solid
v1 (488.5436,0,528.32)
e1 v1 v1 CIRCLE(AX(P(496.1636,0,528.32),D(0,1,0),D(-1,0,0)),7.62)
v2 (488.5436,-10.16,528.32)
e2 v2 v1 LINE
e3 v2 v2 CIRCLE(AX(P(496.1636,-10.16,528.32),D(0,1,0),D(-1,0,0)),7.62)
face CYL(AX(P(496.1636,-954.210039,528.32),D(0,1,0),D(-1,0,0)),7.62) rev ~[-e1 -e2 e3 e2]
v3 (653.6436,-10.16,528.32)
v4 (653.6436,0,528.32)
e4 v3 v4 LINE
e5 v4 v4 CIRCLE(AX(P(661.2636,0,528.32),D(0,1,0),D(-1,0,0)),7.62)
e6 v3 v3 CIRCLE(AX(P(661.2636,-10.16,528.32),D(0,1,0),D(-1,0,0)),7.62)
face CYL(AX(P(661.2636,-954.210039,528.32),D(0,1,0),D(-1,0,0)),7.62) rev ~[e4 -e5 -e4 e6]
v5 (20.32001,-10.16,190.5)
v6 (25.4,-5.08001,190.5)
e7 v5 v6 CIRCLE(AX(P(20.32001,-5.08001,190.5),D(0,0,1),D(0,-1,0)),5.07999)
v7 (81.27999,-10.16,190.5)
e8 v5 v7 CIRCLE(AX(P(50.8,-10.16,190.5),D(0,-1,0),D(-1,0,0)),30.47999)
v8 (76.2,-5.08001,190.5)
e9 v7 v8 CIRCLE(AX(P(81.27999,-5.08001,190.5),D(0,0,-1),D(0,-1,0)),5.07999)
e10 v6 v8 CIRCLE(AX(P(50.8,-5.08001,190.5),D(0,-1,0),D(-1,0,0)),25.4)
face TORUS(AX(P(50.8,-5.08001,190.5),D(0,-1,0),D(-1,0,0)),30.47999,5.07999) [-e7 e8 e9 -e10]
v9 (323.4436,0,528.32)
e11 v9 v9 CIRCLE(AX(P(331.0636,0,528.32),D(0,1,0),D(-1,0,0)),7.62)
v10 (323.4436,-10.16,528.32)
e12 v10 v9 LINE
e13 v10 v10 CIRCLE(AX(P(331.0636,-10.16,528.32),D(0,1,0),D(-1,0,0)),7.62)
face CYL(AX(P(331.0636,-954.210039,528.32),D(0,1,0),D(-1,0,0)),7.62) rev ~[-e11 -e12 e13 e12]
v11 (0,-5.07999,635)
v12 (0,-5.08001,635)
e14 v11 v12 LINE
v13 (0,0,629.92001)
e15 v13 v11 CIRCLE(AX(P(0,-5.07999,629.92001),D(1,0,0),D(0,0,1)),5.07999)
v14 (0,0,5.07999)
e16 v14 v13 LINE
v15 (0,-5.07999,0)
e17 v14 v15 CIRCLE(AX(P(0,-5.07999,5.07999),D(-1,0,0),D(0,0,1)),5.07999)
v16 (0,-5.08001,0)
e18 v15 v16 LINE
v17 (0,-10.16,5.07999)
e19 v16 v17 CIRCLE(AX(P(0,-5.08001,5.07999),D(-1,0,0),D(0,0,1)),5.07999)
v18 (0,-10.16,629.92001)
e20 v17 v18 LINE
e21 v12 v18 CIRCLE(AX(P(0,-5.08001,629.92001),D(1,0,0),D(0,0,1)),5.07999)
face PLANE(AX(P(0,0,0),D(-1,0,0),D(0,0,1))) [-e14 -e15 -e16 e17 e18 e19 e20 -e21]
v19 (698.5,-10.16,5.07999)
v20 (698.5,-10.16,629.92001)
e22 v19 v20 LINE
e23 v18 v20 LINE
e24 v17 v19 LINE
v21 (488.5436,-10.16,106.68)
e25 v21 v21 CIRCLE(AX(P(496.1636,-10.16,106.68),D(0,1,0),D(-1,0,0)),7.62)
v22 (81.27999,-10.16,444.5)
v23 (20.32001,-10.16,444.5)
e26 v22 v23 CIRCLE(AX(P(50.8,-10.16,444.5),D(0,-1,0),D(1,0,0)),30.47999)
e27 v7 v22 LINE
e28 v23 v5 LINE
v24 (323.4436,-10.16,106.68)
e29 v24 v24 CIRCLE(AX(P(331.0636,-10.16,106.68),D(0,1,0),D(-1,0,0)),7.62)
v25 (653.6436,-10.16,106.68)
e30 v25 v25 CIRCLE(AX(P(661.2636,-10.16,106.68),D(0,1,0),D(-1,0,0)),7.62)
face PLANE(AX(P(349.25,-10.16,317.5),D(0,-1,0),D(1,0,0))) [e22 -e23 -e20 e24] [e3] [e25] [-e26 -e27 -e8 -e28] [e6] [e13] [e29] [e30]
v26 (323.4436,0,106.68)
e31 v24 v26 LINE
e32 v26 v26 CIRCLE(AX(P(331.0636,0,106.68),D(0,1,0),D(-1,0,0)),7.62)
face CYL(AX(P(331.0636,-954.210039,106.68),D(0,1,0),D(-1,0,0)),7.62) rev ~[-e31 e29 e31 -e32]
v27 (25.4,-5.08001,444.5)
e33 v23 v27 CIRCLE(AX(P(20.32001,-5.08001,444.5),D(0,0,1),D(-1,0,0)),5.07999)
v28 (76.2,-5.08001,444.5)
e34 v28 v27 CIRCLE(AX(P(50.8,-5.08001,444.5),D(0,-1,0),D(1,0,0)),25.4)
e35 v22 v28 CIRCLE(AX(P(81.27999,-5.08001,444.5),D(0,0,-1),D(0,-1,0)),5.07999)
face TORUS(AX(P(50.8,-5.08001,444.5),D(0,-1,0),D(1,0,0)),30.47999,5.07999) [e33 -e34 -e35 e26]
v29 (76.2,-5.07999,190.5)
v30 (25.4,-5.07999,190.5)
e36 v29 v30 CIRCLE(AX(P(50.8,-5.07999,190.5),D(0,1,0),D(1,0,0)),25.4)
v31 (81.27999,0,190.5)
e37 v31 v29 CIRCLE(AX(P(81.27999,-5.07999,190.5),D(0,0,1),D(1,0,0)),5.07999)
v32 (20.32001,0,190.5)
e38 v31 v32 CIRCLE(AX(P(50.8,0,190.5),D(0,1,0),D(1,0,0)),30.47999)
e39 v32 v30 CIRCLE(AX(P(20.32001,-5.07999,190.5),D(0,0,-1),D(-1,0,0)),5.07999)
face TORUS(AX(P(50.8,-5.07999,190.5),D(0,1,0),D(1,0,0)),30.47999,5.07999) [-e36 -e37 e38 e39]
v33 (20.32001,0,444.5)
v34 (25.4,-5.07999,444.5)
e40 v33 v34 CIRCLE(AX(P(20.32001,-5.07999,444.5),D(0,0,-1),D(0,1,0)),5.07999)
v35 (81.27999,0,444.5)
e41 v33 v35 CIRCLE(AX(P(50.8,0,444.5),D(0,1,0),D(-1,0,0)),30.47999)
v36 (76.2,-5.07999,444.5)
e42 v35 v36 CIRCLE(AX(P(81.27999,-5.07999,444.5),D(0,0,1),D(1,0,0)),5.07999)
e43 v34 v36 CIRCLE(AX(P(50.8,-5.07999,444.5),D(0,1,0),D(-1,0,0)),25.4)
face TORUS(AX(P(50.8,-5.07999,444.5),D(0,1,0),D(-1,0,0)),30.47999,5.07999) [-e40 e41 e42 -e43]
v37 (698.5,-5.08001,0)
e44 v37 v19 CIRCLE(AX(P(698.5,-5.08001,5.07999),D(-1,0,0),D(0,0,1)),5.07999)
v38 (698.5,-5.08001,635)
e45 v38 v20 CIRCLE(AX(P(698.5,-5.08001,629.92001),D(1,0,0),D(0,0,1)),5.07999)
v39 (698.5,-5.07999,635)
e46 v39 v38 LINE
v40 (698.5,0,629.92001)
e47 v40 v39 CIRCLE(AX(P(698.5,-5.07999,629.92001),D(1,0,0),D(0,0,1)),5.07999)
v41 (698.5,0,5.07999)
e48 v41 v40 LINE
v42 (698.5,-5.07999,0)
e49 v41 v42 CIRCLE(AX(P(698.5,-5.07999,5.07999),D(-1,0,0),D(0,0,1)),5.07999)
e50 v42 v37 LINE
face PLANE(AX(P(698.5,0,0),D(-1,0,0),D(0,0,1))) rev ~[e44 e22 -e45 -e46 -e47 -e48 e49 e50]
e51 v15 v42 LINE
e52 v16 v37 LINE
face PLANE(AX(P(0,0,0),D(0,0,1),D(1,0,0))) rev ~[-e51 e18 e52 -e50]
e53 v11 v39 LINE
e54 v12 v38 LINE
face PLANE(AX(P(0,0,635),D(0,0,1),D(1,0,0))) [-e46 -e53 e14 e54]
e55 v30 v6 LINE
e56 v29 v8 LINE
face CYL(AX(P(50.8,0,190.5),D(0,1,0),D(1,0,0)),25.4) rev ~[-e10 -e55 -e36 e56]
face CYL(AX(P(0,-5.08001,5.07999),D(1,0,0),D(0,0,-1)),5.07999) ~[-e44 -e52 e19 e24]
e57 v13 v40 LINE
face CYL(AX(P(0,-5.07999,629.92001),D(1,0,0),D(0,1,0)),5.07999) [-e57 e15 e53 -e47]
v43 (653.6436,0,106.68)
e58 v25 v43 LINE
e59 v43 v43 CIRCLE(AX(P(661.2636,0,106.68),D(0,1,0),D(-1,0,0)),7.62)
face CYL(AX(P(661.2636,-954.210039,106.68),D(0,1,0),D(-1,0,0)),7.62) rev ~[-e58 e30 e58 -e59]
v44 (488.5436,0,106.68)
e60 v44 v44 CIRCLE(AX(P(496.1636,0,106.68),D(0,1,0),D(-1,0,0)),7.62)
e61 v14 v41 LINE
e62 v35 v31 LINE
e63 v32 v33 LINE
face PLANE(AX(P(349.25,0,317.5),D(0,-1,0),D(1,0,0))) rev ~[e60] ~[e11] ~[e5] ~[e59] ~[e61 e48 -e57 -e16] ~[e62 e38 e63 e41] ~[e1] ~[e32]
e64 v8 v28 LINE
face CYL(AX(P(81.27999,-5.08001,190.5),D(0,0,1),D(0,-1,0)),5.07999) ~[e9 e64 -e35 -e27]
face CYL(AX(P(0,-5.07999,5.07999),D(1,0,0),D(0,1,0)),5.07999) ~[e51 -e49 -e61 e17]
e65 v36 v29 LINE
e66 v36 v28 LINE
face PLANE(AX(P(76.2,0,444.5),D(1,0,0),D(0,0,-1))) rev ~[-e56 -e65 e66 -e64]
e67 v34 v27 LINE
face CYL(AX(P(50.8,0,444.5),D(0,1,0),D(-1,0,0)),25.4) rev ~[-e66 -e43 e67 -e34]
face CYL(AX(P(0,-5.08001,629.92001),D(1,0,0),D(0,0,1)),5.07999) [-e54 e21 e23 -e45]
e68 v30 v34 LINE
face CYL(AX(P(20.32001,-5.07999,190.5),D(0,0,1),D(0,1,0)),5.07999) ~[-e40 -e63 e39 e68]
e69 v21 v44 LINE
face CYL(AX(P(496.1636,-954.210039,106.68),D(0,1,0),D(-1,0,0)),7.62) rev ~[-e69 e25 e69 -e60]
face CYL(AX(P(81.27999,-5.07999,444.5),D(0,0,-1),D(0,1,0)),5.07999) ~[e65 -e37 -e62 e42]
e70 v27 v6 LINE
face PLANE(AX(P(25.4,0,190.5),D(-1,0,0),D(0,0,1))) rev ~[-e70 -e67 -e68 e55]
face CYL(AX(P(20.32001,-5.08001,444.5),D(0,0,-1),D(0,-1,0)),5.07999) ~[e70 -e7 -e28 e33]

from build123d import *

# Parameters (mm, degrees)
F0_W     = 698.5
F0_H     = 635
F1_DEPTH = 10.16
F4_DEPTH = 10.161
F5_R     = 5.07999
F6_R     = 5.07999
F8_D     = 15.24


# Not quite as in the source:
# - a fillet or chamfer is up to 0.001 mm smaller than in the source, because OpenCascade refuses the exact size


with BuildPart() as f1:
    # F0 (on Front) → F1 (new body)
    with BuildSketch(Plane.XZ):
        with Locations((349.25, 317.5)):
            Rectangle(F0_W, F0_H)
    extrude(amount=F1_DEPTH)

    # F3 (on face) → F4 (cut, through all)
    with BuildSketch(Plane(origin=(0, 0, 0), x_dir=(-1, 0, 0), z_dir=(0, 1, 0))):
        with BuildLine():
            Line((-25.4, 190.5), (-25.4, 444.5))
            ThreePointArc((-25.4, 444.5), (-50.8, 469.9), (-76.2, 444.5))
            Line((-76.2, 444.5), (-76.2, 190.5))
            ThreePointArc((-76.2, 190.5), (-50.8, 165.1), (-25.4, 190.5))
        make_face()
    extrude(amount=-F4_DEPTH, mode=Mode.SUBTRACT)

    # F5 (radius 5.08 in the source; OpenCascade refuses exactly that, so slightly less here)
    f5_edges = [f1.edges().sort_by_distance(p)[0] for p in [
        (50.8, 0, 165.1),
        (76.2, -10.16, 317.5),
    ]]
    fillet(f5_edges, radius=F5_R)

    # F6 (radius 5.08 in the source; OpenCascade refuses exactly that, so slightly less here)
    f6_edges = [f1.edges().sort_by_distance(p)[0] for p in [
        (349.25, -10.16, 635),
        (349.25, 0, 635),
        (349.25, -10.16, 0),
        (349.25, 0, 0),
    ]]
    fillet(f6_edges, radius=F6_R)

    # F8 (through all)
    with Locations(Plane.XZ.offset(10.16)):
        with Locations((496.1636, 528.32), (331.0636, 528.32), (661.2636, 528.32), (661.2636, 106.68), (496.1636, 106.68), (331.0636, 106.68)):
            Hole(F8_D / 2)


solid = f1.part
